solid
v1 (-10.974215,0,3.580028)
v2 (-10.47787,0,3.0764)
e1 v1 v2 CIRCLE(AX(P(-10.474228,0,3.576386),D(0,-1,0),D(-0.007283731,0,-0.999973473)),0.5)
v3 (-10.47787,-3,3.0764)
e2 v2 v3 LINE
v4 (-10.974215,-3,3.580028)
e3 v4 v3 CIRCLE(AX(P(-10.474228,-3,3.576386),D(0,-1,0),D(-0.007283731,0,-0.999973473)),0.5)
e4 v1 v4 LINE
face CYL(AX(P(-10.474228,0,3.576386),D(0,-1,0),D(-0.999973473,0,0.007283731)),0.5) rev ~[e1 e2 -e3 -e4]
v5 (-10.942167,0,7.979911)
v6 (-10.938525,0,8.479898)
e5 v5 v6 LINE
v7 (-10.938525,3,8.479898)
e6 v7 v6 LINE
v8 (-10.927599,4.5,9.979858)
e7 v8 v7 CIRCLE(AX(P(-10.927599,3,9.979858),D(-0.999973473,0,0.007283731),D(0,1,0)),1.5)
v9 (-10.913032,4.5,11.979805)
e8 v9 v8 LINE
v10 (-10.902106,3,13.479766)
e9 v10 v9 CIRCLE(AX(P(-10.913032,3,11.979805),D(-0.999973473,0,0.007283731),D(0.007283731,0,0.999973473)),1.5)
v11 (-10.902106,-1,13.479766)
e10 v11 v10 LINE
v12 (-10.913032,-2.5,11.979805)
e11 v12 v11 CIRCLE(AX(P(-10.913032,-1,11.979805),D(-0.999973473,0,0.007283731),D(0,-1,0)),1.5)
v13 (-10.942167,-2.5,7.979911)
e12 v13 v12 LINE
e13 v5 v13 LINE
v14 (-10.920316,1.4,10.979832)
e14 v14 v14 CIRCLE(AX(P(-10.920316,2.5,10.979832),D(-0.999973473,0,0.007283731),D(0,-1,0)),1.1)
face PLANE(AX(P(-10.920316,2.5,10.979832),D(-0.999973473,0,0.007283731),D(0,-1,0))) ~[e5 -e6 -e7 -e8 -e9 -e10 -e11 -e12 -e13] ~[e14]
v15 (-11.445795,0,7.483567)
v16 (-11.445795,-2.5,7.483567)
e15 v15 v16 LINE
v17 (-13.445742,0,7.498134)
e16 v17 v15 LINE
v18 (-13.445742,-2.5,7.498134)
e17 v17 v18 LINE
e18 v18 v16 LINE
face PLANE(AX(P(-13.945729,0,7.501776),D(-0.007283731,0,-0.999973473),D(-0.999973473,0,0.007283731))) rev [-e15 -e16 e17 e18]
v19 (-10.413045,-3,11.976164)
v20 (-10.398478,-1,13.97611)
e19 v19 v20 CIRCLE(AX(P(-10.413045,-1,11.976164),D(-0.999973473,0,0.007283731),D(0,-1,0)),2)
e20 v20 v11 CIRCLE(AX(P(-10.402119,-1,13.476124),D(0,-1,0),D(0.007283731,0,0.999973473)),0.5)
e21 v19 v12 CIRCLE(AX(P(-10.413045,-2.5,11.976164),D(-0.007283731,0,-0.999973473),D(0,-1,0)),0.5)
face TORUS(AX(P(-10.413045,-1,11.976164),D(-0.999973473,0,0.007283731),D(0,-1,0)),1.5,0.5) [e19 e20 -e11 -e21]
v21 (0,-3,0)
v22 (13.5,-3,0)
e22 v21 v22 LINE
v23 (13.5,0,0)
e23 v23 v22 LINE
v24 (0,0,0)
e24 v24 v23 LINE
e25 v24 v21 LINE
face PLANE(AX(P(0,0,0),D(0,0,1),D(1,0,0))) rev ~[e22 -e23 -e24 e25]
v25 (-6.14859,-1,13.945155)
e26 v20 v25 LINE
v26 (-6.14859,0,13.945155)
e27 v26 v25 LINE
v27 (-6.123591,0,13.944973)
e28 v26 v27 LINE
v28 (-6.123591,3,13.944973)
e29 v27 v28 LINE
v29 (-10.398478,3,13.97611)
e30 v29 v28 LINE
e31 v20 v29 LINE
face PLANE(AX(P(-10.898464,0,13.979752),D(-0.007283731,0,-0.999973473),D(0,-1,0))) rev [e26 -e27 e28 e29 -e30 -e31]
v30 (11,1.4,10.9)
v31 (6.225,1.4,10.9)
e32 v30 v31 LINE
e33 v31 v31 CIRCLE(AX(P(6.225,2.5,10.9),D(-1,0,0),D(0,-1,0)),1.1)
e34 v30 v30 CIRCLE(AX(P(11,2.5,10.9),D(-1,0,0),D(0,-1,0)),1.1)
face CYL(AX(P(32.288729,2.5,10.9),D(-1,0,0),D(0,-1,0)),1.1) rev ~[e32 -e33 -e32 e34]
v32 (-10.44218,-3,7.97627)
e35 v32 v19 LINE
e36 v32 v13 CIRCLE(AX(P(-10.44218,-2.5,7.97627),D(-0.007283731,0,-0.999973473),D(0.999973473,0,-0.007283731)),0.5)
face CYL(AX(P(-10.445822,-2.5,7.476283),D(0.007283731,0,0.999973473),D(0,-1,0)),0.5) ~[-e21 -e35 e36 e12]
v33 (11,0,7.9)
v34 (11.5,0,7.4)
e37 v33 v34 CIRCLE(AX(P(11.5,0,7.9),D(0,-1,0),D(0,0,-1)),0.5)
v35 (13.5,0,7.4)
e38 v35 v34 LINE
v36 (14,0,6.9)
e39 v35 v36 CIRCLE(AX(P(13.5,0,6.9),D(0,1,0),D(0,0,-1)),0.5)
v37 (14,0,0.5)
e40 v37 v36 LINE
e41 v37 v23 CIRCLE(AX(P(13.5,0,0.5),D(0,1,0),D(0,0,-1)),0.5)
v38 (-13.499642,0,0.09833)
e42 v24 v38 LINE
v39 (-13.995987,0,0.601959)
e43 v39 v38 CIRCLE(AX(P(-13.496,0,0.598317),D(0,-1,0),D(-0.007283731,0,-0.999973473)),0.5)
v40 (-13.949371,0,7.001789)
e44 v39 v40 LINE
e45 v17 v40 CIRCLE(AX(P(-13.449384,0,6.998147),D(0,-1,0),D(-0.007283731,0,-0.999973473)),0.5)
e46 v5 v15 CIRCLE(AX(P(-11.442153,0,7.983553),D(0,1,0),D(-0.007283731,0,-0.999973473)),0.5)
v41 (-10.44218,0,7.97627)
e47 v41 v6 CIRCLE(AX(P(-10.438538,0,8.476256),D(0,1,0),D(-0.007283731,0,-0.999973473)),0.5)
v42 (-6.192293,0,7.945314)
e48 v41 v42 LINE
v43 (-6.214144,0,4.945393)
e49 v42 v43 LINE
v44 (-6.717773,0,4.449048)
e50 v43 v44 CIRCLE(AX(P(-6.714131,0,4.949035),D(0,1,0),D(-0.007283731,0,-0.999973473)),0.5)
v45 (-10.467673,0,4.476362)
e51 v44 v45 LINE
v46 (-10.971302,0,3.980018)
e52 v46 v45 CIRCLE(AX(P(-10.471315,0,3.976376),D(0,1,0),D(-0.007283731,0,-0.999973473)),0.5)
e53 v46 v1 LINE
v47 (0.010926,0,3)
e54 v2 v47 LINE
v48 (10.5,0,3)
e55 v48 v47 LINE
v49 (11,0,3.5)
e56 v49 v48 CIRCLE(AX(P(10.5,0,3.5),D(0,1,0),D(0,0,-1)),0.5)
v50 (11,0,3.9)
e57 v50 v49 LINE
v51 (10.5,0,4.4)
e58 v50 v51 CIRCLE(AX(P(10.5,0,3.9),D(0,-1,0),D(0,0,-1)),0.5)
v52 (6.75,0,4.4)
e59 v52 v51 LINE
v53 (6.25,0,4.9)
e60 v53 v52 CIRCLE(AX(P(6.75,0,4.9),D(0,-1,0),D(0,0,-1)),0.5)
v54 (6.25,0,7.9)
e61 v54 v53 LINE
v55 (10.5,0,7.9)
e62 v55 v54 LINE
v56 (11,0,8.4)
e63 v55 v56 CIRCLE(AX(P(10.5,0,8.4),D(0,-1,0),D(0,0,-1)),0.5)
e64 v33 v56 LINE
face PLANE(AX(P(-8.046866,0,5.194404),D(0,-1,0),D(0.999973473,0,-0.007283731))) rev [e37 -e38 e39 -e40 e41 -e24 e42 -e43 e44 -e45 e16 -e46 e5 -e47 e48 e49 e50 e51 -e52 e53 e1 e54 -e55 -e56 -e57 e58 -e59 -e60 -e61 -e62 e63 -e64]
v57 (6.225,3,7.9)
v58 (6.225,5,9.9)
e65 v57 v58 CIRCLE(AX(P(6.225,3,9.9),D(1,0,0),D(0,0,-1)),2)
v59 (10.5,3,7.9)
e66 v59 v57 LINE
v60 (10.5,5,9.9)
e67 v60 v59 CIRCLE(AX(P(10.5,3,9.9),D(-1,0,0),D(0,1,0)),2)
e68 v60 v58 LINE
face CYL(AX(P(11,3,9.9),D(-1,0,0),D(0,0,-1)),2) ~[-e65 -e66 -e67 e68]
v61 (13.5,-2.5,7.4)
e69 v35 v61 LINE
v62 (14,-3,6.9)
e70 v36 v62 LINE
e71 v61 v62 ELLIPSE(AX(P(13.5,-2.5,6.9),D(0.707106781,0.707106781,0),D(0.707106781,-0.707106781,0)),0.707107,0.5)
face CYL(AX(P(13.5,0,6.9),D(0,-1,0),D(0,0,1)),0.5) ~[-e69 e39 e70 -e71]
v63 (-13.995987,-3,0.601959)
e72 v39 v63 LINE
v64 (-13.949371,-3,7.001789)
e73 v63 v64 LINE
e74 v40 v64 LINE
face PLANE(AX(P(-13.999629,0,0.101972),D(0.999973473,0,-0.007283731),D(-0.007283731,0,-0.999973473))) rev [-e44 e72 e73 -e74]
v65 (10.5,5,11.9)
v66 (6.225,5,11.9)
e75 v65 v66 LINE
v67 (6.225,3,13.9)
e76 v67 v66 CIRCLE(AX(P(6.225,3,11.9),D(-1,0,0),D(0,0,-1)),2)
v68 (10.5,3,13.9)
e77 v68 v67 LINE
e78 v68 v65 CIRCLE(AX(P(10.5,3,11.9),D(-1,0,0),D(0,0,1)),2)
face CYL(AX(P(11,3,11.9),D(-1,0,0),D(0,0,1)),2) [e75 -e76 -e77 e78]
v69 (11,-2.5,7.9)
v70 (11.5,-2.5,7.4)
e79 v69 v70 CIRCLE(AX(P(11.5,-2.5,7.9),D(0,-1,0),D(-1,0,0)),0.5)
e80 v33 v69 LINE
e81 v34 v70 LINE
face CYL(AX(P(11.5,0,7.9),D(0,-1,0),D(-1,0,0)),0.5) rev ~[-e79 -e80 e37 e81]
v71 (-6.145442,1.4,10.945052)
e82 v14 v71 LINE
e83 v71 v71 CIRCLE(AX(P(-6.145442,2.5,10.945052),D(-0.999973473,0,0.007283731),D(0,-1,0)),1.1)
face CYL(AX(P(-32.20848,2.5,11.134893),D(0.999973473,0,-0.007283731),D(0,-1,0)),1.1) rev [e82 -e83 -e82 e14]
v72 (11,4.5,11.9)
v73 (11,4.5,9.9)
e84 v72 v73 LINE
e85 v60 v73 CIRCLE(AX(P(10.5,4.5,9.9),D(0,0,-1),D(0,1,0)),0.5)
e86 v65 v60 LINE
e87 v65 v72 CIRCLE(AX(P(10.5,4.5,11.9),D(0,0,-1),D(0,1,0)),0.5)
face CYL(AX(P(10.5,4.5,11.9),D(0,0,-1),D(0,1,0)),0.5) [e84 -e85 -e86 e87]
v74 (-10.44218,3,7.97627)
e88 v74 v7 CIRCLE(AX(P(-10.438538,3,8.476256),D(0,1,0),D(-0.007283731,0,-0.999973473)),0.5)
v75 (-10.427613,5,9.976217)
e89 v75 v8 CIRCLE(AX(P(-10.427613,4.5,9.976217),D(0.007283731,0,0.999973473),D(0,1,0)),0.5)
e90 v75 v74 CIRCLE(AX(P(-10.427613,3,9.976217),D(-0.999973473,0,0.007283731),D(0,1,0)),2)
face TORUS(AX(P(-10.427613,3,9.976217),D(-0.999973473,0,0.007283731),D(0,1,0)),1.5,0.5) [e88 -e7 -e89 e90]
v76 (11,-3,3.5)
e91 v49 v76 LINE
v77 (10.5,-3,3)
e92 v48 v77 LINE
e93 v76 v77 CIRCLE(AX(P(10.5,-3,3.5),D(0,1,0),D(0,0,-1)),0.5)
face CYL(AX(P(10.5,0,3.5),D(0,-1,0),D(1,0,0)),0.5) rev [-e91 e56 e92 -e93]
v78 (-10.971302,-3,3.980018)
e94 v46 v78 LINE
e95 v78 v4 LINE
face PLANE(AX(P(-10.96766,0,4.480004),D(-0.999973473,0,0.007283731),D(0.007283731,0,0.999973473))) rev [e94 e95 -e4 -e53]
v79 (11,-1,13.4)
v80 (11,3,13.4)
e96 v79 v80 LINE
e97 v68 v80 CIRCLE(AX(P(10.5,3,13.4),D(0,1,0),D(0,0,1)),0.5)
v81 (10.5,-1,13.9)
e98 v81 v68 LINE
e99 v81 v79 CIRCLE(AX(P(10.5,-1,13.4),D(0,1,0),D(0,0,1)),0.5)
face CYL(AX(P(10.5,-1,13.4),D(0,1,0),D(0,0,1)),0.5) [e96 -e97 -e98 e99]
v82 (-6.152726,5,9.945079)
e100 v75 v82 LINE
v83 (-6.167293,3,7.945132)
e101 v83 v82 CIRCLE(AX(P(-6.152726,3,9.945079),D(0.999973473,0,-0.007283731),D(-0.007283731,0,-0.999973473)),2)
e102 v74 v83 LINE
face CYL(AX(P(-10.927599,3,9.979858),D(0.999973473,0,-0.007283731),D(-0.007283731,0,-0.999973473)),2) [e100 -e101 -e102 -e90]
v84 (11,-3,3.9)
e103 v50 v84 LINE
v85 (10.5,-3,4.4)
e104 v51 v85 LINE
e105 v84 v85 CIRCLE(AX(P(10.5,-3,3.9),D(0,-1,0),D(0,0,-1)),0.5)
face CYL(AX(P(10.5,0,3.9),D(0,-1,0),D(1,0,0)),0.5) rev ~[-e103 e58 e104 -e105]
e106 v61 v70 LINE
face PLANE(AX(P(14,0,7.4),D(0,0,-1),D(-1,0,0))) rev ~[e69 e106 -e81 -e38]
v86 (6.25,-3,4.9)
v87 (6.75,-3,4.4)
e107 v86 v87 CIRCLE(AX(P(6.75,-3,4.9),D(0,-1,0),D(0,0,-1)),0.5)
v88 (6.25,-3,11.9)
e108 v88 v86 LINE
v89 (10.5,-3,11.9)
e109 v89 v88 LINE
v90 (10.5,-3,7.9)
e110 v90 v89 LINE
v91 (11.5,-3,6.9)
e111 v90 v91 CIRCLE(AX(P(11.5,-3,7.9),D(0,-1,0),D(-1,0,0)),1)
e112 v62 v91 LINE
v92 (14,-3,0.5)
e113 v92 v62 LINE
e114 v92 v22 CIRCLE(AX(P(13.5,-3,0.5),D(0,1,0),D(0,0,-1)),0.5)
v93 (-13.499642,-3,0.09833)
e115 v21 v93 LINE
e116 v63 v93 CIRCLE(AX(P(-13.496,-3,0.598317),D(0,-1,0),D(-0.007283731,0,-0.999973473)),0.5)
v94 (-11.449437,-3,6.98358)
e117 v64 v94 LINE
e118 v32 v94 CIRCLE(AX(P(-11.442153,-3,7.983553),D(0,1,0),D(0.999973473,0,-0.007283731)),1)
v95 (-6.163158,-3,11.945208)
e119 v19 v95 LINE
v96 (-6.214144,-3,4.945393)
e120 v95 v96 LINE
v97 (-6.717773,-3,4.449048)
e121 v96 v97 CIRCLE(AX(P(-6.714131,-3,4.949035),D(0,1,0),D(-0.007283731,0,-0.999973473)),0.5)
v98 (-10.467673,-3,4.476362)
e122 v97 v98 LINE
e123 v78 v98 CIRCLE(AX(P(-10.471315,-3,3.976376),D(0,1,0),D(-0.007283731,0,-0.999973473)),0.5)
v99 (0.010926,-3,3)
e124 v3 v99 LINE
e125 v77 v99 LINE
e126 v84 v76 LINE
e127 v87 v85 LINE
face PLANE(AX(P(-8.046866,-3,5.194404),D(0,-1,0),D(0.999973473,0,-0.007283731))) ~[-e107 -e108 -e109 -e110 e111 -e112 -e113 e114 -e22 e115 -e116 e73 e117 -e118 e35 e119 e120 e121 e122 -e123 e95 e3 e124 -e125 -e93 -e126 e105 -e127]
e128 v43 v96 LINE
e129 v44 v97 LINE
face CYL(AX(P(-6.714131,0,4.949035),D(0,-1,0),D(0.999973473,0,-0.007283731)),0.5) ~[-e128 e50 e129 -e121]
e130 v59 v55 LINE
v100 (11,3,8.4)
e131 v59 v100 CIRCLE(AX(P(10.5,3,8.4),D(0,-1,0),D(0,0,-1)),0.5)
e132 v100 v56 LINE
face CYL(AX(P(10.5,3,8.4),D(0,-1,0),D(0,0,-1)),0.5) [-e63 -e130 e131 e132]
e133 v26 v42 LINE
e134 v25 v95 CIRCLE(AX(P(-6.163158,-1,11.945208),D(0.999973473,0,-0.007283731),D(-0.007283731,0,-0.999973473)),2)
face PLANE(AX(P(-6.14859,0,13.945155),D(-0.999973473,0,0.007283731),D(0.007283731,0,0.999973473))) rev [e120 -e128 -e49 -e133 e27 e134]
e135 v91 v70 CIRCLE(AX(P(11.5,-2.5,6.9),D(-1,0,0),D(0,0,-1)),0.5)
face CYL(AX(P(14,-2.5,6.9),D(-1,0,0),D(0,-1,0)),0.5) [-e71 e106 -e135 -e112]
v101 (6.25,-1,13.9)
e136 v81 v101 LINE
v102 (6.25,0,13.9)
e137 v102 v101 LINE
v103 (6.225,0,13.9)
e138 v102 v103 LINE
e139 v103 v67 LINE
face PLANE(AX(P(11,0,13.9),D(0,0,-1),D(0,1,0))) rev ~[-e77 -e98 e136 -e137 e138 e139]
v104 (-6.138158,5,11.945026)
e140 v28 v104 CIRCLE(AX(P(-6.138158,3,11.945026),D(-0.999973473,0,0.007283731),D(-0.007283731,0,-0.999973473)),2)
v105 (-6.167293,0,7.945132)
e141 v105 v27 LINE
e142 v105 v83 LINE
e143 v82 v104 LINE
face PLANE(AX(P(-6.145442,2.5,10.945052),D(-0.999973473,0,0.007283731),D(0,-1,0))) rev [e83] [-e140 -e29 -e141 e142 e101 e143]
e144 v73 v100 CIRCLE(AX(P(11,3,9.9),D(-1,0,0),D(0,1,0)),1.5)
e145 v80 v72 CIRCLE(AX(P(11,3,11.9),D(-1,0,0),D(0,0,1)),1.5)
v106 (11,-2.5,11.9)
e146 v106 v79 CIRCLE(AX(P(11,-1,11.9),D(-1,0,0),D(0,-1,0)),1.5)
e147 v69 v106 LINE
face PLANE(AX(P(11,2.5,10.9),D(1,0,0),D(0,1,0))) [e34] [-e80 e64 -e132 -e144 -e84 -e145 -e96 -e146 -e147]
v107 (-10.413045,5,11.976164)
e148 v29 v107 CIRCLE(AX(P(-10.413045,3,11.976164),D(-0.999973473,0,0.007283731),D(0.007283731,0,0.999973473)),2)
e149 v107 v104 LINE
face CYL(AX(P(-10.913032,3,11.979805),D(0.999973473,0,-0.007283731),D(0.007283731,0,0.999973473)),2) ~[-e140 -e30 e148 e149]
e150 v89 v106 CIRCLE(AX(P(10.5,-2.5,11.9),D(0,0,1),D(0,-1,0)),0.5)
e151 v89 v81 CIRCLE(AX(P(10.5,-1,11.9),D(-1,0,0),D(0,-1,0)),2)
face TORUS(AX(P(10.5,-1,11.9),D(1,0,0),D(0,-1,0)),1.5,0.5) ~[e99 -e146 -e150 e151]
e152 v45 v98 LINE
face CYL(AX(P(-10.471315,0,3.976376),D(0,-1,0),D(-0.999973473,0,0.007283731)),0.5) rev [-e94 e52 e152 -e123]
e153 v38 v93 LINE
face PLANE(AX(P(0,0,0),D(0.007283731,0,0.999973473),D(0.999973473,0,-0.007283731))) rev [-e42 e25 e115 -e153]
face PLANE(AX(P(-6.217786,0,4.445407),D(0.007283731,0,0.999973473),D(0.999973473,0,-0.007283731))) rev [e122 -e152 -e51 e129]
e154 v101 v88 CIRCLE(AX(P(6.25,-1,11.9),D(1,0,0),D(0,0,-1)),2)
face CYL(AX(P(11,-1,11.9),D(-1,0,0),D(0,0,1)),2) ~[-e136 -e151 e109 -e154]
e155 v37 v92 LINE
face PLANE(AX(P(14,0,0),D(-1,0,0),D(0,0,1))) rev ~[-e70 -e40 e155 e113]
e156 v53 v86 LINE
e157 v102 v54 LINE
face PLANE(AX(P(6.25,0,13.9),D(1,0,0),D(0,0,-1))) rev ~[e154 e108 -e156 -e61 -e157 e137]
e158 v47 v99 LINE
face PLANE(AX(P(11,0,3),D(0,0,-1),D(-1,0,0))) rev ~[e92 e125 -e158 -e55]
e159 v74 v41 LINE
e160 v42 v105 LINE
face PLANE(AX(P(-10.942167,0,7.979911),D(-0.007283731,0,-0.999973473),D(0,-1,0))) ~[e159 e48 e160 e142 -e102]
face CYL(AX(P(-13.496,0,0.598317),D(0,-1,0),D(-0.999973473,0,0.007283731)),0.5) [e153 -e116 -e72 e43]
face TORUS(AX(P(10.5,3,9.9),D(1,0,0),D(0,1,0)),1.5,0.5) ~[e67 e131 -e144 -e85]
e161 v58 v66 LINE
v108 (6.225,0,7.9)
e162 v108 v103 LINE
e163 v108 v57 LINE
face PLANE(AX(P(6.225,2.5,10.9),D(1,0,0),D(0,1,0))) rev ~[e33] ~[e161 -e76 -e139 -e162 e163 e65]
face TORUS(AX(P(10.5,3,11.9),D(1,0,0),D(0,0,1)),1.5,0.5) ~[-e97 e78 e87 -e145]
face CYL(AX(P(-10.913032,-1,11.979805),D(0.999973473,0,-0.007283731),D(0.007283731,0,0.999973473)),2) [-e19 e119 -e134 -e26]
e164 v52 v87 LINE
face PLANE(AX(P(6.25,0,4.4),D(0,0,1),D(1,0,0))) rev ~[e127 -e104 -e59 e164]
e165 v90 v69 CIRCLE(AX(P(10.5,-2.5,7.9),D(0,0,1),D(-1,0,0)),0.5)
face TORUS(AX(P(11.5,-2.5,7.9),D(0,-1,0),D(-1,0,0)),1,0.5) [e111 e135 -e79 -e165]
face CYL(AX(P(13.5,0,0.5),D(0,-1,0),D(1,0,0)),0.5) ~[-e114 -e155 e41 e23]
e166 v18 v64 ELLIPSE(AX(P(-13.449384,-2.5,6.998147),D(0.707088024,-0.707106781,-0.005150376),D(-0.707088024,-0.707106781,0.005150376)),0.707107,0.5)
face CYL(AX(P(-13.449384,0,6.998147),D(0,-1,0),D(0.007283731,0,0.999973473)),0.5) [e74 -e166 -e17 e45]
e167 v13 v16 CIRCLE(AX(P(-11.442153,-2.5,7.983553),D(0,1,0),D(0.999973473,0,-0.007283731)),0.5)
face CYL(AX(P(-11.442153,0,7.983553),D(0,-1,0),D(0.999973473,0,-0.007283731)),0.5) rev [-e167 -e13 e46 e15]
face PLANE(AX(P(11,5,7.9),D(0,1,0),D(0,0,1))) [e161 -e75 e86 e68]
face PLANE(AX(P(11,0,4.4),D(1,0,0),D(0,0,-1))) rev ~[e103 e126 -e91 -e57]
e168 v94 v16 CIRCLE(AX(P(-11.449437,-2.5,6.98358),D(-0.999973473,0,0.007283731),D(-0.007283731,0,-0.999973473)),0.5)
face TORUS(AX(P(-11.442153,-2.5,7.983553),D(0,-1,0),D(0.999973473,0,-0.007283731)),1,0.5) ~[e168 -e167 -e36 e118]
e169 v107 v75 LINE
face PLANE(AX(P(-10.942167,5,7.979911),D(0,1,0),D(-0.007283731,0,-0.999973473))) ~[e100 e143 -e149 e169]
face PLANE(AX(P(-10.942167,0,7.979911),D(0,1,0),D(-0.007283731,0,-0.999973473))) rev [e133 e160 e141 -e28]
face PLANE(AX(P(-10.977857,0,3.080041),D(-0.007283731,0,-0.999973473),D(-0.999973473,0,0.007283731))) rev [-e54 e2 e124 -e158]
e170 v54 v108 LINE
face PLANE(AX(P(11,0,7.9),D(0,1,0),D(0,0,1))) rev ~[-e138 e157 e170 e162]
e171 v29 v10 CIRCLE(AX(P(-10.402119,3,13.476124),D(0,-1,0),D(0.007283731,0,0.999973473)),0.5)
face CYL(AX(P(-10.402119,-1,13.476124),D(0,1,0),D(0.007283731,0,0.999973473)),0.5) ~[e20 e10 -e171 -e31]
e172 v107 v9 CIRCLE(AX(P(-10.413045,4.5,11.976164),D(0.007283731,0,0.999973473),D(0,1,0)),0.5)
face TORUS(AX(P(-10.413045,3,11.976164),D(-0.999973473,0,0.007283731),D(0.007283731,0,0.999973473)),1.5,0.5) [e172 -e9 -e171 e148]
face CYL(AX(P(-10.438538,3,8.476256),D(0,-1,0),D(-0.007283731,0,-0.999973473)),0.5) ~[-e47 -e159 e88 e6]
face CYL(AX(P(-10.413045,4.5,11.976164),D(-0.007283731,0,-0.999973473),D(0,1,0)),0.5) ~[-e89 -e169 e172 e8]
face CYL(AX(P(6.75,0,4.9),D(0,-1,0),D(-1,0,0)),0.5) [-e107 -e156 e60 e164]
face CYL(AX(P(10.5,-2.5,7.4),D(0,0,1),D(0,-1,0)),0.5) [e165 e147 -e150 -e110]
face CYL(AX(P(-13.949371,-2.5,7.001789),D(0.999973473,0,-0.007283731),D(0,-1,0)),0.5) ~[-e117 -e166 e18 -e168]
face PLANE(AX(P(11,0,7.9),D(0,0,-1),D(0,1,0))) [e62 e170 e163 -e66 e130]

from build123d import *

# Parameters (mm, degrees)
F1_DEPTH = 3
F2_W     = 5
F2_H     = 6
F3_DEPTH = 4.775
F4_D     = 2.2
F5_R     = 2
F6_R     = 0.5


# Not quite as in the source:
# - a feature names something its author has since deleted; it is built from what else it names


with BuildPart() as f1:
    # F0 (on Front) → F1 (new body)
    with BuildSketch(Plane.XZ):
        Polygon((0.0109257422, 3), (0, 0), (14, 0), (14, 7.4), (11, 7.4), (11, 13.9), (6.25, 13.9), (6.25, 4.4), (11, 4.4), (11, 3), align=None)
    extrude(amount=F1_DEPTH)

    # F2 (on face) → F3 (join)
    with BuildSketch(Plane.YZ.offset(11)):
        with Locations((2.5, 10.9)):
            Rectangle(F2_W, F2_H)
    extrude(amount=-F3_DEPTH)

    # F4 (through all)
    with Locations(Plane.YZ.offset(11)):
        with Locations((2.5, 10.9)):
            Hole(F4_D / 2)

    # F5
    f5_edges = [f1.edges().sort_by_distance(p)[0] for p in [
        (8.6125, 5, 13.9),
        (8.6125, 5, 7.9),
        (8.625, -3, 13.9),
    ]]
    fillet(f5_edges, radius=F5_R)

    # F6 (call 1 of 5: OpenCascade refuses the feature's edges together)
    f6_edges = [f1.edges().sort_by_distance(p)[0] for p in [
        (14, -1.5, 7.4),
        (11, -1.5, 7.4),
        (11, 1, 13.9),
        (11, -3, 9.65),
        (12.5, -3, 7.4),
        (11, -2.414214, 13.314214),
        (11, 4.414214, 13.314214),
        (11, 1.5, 7.9),
        (11, 5, 10.9),
        (11, 4.414214, 8.485786),
    ]]
    fillet(f6_edges, radius=F6_R)

    # F6#2 (call 2 of 5)
    f6_2_edges = [f1.edges().sort_by_distance(p)[0] for p in [
        (6.25, -1.5, 4.4),
    ]]
    fillet(f6_2_edges, radius=F6_R)

    # F6#3 (call 3 of 5)
    f6_3_edges = [f1.edges().sort_by_distance(p)[0] for p in [
        (14, -1.5, 0),
    ]]
    fillet(f6_3_edges, radius=F6_R)

    # F6#4 (call 4 of 5)
    f6_4_edges = [f1.edges().sort_by_distance(p)[0] for p in [
        (11, -1.5, 4.4),
    ]]
    fillet(f6_4_edges, radius=F6_R)

    # F6#5 (call 5 of 5)
    f6_5_edges = [f1.edges().sort_by_distance(p)[0] for p in [
        (11, -1.5, 3),
    ]]
    fillet(f6_5_edges, radius=F6_R)

    # F7: F1 across face


with BuildPart() as f1_1:
    add(f1.part)
    add(f1.part.mirror(Plane(origin=(0.0054628711, -1.5, 1.5), x_dir=(0, -1, 0), z_dir=(-0.9999933683, 0, 0.0036418899))))


solid = f1_1.part
